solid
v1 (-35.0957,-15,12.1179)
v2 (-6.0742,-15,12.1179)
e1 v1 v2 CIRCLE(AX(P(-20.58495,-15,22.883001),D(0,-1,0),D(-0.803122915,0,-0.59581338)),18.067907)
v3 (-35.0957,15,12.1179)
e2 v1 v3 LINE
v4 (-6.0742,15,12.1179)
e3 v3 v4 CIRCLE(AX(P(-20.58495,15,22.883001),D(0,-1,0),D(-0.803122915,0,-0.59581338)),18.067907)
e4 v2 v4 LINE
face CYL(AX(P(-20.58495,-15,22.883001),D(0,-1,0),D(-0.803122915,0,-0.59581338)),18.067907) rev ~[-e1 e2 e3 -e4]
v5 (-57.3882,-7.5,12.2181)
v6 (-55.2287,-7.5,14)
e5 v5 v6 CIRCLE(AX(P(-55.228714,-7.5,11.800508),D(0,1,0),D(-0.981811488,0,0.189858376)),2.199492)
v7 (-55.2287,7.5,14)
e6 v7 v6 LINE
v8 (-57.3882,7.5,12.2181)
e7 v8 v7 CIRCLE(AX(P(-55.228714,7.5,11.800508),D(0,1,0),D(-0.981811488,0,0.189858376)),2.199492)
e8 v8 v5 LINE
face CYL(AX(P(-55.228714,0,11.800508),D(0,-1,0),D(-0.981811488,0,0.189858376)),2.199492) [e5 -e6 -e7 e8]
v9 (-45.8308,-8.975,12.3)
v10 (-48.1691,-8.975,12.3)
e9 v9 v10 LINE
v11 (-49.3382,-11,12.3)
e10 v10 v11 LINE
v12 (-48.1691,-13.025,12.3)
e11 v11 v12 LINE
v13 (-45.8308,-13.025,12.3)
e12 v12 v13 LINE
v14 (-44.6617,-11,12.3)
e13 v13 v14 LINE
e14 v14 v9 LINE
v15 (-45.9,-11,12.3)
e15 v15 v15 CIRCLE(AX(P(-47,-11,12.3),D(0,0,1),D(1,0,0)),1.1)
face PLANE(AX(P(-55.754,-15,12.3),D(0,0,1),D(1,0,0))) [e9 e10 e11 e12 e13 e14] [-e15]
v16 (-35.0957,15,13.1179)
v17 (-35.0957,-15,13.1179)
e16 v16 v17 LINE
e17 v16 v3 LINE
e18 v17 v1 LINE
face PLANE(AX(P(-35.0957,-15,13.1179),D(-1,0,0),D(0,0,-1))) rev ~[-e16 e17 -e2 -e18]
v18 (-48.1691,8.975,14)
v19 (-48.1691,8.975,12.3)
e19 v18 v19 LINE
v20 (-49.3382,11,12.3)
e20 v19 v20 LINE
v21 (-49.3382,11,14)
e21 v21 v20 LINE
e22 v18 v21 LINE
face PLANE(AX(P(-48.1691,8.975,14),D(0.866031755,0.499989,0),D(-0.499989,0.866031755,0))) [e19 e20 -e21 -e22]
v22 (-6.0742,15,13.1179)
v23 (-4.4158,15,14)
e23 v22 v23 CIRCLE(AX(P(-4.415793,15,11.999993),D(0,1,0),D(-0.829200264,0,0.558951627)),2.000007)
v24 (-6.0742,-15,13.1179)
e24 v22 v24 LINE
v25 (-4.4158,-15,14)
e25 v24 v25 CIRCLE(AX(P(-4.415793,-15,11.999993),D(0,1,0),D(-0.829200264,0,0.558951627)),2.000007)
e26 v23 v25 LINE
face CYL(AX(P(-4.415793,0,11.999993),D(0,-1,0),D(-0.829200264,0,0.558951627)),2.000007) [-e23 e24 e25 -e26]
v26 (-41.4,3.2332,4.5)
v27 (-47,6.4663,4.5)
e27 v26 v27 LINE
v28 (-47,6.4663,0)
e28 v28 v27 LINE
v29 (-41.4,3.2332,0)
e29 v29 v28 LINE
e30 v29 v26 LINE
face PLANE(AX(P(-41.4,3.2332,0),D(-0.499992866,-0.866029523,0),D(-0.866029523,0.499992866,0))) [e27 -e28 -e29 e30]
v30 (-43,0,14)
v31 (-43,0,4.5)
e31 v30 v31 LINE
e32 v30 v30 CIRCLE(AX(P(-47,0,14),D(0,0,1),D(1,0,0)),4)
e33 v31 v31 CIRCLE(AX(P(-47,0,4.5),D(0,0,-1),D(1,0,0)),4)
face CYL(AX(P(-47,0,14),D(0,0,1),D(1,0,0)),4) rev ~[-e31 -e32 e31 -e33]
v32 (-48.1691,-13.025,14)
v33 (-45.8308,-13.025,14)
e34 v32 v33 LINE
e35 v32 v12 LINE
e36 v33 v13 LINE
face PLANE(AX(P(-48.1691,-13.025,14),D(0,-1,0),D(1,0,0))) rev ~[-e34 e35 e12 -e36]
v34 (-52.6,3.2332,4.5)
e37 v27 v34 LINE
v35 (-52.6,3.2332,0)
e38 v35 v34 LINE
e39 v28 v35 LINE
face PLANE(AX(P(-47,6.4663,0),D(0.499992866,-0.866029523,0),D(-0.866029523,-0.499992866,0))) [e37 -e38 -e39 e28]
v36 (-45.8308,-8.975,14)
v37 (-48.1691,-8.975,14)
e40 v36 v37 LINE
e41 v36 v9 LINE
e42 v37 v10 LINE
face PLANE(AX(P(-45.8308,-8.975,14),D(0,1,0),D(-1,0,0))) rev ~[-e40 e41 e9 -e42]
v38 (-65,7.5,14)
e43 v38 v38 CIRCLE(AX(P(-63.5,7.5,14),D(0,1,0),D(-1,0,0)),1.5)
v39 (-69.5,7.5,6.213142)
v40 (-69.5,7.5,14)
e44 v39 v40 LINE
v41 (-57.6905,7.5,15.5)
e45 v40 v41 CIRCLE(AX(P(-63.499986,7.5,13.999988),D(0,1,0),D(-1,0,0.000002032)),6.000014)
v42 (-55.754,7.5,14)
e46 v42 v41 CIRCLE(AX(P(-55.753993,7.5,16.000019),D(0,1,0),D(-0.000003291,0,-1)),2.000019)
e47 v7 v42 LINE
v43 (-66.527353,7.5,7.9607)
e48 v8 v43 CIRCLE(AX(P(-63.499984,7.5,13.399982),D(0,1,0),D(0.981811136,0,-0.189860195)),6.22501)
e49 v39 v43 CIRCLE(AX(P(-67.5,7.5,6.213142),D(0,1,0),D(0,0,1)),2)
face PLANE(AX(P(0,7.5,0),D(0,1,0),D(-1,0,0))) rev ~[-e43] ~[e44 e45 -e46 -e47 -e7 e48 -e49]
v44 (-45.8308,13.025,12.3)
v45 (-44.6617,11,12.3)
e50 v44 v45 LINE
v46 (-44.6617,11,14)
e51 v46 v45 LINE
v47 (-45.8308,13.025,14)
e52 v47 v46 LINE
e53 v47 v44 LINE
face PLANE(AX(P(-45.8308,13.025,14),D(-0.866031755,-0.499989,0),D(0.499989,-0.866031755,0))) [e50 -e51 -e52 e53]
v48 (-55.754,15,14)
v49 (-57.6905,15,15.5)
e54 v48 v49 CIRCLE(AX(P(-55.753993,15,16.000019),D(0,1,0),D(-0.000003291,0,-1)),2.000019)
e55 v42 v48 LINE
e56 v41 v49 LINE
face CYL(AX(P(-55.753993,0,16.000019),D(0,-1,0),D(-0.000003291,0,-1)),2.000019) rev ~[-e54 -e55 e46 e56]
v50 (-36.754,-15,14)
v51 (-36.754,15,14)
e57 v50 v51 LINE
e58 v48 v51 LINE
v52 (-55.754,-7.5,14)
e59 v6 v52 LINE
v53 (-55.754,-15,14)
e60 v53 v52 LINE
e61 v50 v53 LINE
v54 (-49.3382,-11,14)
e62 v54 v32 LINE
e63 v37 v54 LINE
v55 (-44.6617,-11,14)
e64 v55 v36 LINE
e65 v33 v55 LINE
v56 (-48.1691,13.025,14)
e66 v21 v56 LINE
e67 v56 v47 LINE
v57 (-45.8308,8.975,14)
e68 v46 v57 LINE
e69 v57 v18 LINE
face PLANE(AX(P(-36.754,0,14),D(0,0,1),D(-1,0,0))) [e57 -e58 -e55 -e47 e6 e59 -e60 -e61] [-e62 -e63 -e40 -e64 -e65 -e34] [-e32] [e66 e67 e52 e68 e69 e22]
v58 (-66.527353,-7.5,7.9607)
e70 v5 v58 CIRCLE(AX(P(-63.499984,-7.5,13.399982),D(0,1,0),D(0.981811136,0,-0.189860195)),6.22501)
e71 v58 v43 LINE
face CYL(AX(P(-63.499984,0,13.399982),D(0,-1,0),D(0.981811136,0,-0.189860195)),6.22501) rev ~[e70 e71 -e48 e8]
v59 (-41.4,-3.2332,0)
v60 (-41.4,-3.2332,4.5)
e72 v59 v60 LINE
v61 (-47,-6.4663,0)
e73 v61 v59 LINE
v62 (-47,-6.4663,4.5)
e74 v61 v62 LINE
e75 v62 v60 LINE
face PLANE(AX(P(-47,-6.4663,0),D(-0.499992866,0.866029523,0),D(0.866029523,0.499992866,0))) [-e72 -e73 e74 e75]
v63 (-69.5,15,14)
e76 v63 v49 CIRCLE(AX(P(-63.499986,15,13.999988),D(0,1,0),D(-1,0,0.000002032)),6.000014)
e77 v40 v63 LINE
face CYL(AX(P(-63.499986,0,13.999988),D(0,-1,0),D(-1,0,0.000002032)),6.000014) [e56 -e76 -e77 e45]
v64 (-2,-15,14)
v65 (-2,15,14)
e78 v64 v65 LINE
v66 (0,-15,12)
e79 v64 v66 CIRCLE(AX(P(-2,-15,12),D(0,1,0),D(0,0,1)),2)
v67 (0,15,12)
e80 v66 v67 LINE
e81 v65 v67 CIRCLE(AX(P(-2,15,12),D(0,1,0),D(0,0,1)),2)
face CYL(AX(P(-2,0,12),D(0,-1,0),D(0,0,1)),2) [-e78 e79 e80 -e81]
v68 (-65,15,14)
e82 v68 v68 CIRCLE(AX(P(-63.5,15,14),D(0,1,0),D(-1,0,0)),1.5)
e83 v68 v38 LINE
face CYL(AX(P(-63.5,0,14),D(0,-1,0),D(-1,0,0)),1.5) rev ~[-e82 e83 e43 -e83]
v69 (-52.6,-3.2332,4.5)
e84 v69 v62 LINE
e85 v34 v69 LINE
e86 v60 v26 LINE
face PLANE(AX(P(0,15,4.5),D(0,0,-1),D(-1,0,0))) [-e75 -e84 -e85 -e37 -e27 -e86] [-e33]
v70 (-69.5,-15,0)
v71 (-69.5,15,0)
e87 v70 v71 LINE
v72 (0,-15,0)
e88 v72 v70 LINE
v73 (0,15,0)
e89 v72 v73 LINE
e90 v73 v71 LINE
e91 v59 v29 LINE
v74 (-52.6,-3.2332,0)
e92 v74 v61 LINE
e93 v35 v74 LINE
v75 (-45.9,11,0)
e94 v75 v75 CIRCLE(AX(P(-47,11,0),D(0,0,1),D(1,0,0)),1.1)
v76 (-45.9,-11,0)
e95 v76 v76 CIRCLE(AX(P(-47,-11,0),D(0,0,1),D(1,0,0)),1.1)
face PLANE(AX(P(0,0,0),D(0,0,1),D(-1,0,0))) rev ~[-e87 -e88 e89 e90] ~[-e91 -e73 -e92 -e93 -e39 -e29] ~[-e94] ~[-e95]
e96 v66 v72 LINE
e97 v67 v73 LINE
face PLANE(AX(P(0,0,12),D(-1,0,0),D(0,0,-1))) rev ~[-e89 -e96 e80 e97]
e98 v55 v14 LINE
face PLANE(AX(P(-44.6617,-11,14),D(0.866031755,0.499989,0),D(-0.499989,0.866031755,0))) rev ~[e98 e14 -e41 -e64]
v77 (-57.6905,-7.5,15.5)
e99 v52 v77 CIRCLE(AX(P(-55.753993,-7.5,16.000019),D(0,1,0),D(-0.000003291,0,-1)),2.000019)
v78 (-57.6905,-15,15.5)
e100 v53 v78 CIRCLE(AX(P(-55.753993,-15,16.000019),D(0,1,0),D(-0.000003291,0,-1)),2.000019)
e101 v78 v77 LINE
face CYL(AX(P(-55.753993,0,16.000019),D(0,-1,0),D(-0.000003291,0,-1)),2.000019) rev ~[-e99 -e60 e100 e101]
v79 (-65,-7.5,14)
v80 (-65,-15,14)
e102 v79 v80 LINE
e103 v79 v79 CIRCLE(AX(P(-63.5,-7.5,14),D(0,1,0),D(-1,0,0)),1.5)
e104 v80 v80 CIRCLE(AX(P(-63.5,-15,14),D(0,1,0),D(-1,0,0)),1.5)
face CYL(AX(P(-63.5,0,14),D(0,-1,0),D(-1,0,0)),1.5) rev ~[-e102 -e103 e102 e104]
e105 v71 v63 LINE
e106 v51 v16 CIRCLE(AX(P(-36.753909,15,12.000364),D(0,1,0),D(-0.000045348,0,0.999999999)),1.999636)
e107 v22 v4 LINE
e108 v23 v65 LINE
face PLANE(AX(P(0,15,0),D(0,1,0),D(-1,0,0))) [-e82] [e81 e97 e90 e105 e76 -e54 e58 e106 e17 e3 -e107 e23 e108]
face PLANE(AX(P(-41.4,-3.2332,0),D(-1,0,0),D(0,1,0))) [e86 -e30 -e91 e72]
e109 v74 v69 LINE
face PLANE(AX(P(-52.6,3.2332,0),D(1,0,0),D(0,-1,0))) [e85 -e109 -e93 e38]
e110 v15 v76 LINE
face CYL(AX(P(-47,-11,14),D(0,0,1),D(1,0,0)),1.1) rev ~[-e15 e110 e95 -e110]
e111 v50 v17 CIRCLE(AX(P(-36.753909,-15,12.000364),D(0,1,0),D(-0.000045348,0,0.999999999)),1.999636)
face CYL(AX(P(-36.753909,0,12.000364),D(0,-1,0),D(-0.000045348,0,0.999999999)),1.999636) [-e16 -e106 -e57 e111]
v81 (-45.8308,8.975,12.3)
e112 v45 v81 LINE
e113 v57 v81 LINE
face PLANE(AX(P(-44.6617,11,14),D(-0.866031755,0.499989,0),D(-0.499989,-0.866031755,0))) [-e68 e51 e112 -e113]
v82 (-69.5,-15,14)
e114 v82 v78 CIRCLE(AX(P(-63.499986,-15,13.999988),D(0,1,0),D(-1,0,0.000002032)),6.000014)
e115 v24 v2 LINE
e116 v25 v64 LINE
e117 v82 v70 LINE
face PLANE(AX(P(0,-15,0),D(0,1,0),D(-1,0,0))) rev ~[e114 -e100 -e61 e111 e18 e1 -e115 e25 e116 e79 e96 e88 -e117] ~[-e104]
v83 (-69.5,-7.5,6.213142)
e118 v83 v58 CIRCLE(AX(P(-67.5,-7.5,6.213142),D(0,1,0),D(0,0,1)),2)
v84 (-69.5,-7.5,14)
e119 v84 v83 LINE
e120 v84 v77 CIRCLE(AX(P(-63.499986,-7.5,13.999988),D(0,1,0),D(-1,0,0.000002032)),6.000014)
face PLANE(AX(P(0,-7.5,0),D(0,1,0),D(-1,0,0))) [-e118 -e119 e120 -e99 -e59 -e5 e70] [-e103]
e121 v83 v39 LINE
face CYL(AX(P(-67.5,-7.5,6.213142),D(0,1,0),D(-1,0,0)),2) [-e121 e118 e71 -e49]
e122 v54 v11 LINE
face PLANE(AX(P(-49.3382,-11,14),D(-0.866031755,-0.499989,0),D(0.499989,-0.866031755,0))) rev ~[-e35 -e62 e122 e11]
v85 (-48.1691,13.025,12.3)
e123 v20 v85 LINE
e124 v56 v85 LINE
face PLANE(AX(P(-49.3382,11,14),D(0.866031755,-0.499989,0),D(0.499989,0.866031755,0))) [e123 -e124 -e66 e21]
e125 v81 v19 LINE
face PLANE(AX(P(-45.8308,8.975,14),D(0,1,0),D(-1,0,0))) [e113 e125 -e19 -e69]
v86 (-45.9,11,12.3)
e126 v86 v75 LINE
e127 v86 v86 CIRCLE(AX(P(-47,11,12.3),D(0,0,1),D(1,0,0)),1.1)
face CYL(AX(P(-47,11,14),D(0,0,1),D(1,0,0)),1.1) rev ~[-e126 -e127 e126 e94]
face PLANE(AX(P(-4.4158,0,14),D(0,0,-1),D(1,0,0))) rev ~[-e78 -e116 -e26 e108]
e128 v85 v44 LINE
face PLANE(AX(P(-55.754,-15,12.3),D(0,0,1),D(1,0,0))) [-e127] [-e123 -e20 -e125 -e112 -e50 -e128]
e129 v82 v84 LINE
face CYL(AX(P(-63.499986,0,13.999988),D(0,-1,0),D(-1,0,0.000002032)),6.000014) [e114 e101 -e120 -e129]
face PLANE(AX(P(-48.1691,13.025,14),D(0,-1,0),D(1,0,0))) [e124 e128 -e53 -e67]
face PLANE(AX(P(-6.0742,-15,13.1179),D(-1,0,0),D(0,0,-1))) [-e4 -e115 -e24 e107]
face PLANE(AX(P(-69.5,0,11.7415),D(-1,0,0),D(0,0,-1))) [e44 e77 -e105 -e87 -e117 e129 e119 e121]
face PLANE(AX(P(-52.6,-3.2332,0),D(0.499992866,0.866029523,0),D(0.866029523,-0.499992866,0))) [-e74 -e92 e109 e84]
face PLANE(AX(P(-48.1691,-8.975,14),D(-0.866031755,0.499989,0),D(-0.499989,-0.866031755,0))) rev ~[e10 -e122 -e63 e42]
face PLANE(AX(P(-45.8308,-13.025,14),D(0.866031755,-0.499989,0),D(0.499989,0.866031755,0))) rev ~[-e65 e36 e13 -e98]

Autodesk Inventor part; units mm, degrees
ref_plane "YZ Plane" through (0, 0, 0) normal (1, 0, 0) x (0, 1, 0)
ref_plane "XZ Plane" through (0, 0, 0) normal (0, 1, 0) x (-1, 0, 0)
ref_plane "XY Plane" through (0, 0, 0) normal (0, 0, 1) x (1, 0, 0)
sketch "Sketch2" plane through (0, 0, 0) normal (0, 1, 0) x (-1, 0, 0)
  arc A0 (2, 14) -> (0, 12) centre (2, 12) ccw
  arc A1 (6.0742, 13.1179) -> (35.0957, 13.1179) centre (20.5849, 22.9) ccw
  line L0 (36.754, 14) -> (55.754, 14)
  arc A2 (69.5, 14) -> (57.6905, 15.5) centre (63.5, 14) ccw
  circle A3 centre (63.5, 14) radius 1.5
  arc A4 (55.754, 14) -> (57.6905, 15.5) centre (55.754, 16) ccw
  arc A5 (36.754, 14) -> (35.0957, 13.1179) centre (36.754, 12) ccw
  arc A6 (6.0742, 13.1179) -> (4.4158, 14) centre (4.4158, 12) ccw
  arc A7 (57.3882, 12.2181) -> (55.2287, 14) centre (55.2287, 11.8005) ccw
  line L1 (0, 12) -> (0, 0)
  line L2 (0, 0) -> (69.5, 0)
  line L3 (69.5, 14) -> (69.5, 0)
  arc A8 (57.3882, 12.2181) -> (69.5, 11.7415) centre (63.5, 13.4) ccw
  line L4 (4.4158, 14) -> (2, 14)
  point P0 (0, 0)
  point P1 (20.5849, 5.4)
  dimension "d3" = 2
  dimension "d17" = 3
  dimension "d18" = 2
  dimension "d137" = 2.1995
  dimension "d140" = 12
  dimension "d141" = 69.5
  dimension "d142" = 14
  dimension "d143" = 6
  dimension "d144" = 17.5
  dimension "d145" = 19
  dimension "d146" = 5.4
  dimension "d147" = 6.225
  dimension "d148" = 13.4
extrude "Extrusion1" add sketch "Sketch2" along normal mid plane 30
extrude "Extrusion2" cut sketch "Sketch2" along normal mid plane 15 contours A8 A7 L0 A4 A2 L3
sketch "Sketch7" plane through (0, -15, 0) normal (0, -1, 0) x (1, 0, 0)
  arc A0 (-4.4158, 14) -> (-6.0742, 13.1179) centre (-4.4158, 12) ccw projected
  line L0 (-6.0742, 13.1179) -> (-6.0742, 12.1179)
  arc A1 (-35.0957, 13.1179) -> (-6.0742, 13.1179) centre (-20.5849, 22.9) ccw projected
  line L1 (-35.0957, 13.1179) -> (-35.0957, 12.1179)
  arc A2 (-35.0957, 12.1179) -> (-6.0742, 12.1179) centre (-20.5849, 22.8831) ccw
  point P0 (0, 0)
  point P1 (-6.3389, 0)
  dimension "d59" = 1
  dimension "d60" = 1
extrude "Extrusion10" cut sketch "Sketch7" against normal up to next
fillet "Fillet4" radius 2 1 edges at (-69.5, 0, 11.7415)
sketch "Sketch13" plane through (-55.754, -15, 14) normal (0, 0, 1) x (1, 0, 0)
  circle A0 centre (8.754, 15) radius 4
  line L0 (55.754, 0) -> (55.754, 30) projected
  line L1 (14.254, 18.1754) -> (14.254, 11.8246)
  line L2 (14.254, 11.8246) -> (8.754, 8.6491)
  line L3 (8.754, 8.6491) -> (3.254, 11.8246)
  line L4 (3.254, 11.8246) -> (3.254, 18.1754)
  line L5 (3.254, 18.1754) -> (8.754, 21.3509)
  line L6 (8.754, 21.3509) -> (14.254, 18.1754)
  line L7 (19, 0) -> (0, 0) projected
  circle A1 centre (8.754, 26) radius 1.1
  line L8 (8.754, 15) -> (25.6273, 15) construction
  line L9 (9.9232, 23.975) -> (7.5849, 23.975)
  line L10 (7.5849, 23.975) -> (6.4158, 26)
  line L11 (6.4158, 26) -> (7.5849, 28.025)
  line L12 (7.5849, 28.025) -> (9.9232, 28.025)
  line L13 (9.9232, 28.025) -> (11.0923, 26)
  line L14 (11.0923, 26) -> (9.9232, 23.975)
  circle A2 centre (8.754, 4) radius 1.1
  line L15 (9.9232, 6.025) -> (7.5849, 6.025)
  line L16 (7.5849, 6.025) -> (6.4158, 4)
  line L17 (6.4158, 4) -> (7.5849, 1.975)
  line L18 (7.5849, 1.975) -> (9.9232, 1.975)
  line L19 (9.9232, 1.975) -> (11.0923, 4)
  line L20 (11.0923, 4) -> (9.9232, 6.025)
  point P0 (55.754, 15)
  dimension "d99" = 8
  dimension "d106" = 47
  dimension "d131" = 11
  dimension "d132" = 15
  dimension "d159" = 2.2
  dimension "d160" = 11
  dimension "d163" = 4.05
extrude "Extrusion15" cut sketch "Sketch13" against normal up to next contours A0
sketch "Sketch17" plane through (-55.754, -15, 14) normal (0, 0, 1) x (1, 0, 0)
  point P0 (55.754, 15)
sketch "Sketch19" plane through (0, 15, 0) normal (0, 0, -1) x (-1, 0, 0)
  circle A0 centre (47, -15) radius 4 projected
  line L0 (47, -21.4663) -> (41.4, -18.2332)
  line L1 (41.4, -18.2332) -> (41.4, -11.7668)
  line L2 (41.4, -11.7668) -> (47, -8.5337)
  line L3 (47, -8.5337) -> (52.6, -11.7668)
  line L4 (52.6, -11.7668) -> (52.6, -18.2332)
  line L5 (52.6, -18.2332) -> (47, -21.4663)
  point P0 (0, -15)
  dimension "d156" = 11.2
extrude "Extrusion23" cut sketch "Sketch19" against normal blind 4.5
sketch "Sketch20" plane through (0, 15, 0) normal (0, 1, 0) x (1, 0, 0)
  point P0 (0, 0)
extrude "Extrusion24" cut sketch "Sketch13" against normal up to next contours A1 | A2
extrude "Extrusion25" cut sketch "Sketch13" against normal blind 1.7 contours A1 | L9 L10 L11 L12 L13 L14 | A2 | L20 L19 L18 L17 L16 L15
properties part number "Bike_Mount_Right" material "PC/ABS Plastic"
